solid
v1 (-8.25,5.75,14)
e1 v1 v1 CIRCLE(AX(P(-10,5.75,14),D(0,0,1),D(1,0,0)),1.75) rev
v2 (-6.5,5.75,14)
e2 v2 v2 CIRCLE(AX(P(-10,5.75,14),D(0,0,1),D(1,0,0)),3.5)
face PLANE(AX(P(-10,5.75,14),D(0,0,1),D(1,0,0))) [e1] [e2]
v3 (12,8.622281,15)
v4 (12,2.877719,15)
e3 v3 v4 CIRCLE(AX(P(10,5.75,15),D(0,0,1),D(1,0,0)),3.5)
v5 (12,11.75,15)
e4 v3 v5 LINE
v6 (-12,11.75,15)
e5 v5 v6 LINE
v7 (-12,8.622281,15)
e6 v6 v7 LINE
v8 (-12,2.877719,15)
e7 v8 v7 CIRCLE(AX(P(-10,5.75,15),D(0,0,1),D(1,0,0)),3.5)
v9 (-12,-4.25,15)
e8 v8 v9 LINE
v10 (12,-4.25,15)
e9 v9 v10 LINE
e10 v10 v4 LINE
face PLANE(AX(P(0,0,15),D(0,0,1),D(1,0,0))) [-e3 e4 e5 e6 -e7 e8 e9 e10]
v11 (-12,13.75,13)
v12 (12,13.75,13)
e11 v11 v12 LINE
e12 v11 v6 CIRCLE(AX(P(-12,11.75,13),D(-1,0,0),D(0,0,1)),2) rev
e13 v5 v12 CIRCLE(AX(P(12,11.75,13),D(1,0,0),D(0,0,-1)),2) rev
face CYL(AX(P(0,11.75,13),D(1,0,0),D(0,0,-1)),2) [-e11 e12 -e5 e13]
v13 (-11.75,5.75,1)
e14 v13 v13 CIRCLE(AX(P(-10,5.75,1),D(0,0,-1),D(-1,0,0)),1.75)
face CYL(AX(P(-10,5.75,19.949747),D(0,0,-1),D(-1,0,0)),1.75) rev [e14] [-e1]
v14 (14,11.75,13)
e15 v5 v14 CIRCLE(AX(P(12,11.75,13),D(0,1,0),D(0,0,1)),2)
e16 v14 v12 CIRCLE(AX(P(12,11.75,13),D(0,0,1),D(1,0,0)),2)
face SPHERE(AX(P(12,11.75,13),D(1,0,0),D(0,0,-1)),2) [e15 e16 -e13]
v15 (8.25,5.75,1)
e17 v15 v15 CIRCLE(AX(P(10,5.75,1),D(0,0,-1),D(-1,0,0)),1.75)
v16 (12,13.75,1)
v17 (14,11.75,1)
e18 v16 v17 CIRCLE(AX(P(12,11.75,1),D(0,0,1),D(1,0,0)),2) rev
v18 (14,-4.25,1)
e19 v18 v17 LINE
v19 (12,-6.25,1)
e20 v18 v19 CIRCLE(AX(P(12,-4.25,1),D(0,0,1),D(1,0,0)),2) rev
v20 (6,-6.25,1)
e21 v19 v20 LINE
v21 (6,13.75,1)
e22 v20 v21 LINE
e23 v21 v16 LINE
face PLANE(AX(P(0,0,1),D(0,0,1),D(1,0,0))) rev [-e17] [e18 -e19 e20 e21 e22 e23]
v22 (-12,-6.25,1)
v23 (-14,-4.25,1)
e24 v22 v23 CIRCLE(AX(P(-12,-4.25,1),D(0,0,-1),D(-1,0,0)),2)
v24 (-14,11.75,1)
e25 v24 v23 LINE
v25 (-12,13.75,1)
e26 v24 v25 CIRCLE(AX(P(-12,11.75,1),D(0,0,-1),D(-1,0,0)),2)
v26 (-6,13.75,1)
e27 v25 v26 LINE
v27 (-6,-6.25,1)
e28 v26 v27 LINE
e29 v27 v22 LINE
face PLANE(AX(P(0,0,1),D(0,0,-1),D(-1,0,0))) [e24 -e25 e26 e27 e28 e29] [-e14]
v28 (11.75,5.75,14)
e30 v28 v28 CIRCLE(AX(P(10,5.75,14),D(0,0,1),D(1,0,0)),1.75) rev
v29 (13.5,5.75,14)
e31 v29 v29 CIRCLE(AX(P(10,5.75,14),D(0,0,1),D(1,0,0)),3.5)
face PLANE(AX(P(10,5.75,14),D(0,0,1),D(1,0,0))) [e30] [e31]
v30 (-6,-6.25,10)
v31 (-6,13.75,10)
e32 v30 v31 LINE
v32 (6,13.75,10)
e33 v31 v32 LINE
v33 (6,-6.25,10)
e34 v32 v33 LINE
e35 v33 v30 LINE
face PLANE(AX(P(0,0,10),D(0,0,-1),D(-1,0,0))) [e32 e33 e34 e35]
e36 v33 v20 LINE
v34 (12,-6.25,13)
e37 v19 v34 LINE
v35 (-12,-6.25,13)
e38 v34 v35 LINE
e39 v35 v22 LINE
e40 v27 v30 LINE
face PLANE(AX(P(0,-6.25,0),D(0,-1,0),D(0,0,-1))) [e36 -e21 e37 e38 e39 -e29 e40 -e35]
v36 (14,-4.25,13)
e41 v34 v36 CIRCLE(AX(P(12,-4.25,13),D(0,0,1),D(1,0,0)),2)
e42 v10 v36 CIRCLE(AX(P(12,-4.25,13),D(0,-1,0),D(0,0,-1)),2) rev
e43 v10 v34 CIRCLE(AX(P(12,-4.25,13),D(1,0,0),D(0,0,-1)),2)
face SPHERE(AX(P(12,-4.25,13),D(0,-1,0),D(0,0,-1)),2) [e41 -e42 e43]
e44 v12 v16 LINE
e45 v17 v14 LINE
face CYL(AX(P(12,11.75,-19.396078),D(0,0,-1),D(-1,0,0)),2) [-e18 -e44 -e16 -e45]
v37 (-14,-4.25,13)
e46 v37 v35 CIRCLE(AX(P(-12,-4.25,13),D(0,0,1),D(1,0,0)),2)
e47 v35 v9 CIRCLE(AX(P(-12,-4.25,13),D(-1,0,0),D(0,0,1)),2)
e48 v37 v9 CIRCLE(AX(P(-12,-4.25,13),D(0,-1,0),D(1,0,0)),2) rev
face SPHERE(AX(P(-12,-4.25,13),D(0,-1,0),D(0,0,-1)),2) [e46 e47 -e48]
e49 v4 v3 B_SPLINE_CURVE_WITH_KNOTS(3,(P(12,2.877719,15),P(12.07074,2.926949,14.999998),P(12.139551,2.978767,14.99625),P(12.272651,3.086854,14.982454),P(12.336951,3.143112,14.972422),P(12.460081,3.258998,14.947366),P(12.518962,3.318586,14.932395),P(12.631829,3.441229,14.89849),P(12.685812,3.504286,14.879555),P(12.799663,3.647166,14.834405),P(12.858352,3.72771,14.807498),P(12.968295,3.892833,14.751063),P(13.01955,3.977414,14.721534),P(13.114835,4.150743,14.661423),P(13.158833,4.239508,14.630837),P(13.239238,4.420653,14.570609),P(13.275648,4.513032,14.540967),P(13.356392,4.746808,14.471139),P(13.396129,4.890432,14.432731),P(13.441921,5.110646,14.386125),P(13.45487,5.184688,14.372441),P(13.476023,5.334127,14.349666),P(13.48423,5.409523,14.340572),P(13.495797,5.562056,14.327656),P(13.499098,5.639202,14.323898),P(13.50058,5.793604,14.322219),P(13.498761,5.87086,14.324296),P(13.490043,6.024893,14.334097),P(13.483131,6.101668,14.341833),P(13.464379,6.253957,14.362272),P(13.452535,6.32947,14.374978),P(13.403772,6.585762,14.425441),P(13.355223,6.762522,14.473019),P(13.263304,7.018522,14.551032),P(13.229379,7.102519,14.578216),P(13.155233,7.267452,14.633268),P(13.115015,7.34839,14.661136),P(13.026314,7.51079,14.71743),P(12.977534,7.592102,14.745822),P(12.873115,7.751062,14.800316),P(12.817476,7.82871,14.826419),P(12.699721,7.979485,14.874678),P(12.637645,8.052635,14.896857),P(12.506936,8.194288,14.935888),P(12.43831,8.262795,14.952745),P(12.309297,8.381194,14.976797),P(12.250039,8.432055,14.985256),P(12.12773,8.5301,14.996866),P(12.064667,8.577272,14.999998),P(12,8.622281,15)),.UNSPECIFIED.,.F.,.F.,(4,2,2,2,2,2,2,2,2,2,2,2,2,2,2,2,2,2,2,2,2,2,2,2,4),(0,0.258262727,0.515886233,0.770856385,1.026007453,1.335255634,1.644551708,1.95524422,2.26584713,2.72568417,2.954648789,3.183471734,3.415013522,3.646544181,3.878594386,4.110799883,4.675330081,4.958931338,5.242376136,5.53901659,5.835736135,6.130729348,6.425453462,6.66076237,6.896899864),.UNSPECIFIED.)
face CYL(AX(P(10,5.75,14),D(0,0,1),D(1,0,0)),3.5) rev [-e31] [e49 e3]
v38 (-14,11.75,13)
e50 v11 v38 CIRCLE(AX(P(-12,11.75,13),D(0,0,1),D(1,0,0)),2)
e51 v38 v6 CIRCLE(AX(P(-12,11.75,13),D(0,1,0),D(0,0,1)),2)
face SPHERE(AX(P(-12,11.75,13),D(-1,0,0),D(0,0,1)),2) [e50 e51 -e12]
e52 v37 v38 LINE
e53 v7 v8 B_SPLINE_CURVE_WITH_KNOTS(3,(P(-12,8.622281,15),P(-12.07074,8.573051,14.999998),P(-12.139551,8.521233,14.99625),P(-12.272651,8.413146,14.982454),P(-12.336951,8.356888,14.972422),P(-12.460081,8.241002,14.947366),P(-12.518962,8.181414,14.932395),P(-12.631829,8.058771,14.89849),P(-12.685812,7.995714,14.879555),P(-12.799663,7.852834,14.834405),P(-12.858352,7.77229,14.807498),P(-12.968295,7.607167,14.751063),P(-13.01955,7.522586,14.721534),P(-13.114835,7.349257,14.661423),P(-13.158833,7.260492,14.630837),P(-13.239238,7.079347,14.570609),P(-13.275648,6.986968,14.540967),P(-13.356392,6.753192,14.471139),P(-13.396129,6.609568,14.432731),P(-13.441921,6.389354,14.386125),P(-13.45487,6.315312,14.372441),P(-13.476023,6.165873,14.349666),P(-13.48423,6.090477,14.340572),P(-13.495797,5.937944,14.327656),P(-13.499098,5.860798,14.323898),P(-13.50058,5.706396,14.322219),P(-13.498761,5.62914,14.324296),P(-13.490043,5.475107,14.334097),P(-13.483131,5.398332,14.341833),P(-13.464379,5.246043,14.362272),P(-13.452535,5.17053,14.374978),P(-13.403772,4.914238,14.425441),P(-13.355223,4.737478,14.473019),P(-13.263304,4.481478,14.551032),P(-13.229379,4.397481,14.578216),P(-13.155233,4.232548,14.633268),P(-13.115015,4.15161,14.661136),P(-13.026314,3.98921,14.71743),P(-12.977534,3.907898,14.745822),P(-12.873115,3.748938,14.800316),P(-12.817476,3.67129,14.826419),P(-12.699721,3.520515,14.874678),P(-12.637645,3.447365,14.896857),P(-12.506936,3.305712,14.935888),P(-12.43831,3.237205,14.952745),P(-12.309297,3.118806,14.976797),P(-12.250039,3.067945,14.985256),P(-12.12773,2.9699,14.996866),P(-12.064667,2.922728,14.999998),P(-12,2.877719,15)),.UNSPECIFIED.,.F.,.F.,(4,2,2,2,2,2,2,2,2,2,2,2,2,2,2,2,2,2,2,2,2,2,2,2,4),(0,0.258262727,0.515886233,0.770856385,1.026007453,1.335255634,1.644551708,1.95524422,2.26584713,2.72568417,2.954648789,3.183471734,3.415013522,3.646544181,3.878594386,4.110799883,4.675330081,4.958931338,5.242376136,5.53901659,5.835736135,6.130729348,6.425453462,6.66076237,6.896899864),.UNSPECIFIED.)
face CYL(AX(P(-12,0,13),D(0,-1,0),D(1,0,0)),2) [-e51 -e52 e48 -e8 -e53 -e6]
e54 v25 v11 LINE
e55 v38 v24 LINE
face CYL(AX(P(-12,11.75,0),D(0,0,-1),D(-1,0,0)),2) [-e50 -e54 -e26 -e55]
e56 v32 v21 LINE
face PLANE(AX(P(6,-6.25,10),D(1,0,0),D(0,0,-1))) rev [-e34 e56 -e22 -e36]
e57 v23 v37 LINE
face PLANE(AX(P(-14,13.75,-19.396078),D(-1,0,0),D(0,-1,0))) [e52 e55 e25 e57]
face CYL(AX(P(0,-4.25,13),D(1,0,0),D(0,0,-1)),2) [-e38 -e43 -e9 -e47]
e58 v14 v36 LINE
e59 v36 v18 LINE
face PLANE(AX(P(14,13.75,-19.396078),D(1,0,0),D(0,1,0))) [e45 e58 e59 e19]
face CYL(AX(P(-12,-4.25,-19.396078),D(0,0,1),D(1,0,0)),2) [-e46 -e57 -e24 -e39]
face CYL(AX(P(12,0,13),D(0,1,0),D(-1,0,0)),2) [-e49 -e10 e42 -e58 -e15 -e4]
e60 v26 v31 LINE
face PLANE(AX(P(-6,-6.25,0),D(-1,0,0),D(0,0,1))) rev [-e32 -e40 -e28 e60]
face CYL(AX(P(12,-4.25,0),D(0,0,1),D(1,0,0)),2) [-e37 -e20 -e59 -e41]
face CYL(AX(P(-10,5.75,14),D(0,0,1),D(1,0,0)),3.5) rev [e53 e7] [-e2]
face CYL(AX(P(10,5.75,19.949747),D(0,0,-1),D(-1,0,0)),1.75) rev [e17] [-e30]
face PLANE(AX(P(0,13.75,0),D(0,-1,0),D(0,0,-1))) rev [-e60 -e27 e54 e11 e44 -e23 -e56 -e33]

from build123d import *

# Parameters (mm, degrees)
SKETCH1_W                = 42
SKETCH1_H                = 14
BOSS_EXTRUDE1_DEPTH      = 20
SKETCH2_W                = 11
SKETCH2_H                = 10
CUT_EXTRUDE1_DEPTH       = 33.202484376
SKETCH3_W                = 11
SKETCH3_H                = 10
CUT_EXTRUDE2_DEPTH       = 33.202484376
SKETCH4_W                = 12
SKETCH4_H                = 10
CUT_EXTRUDE3_DEPTH       = 33.202484376
F_4_0_4_DIAMETER_HOLE1_D = 4
FILLET1_R                = 1
SKETCH7_W                = 53.135320533
SKETCH7_H                = 18.013507302
CUT_EXTRUDE4_DEPTH       = 1.5
SKETCH8_W                = 12
SKETCH8_H                = 12.5
CUT_EXTRUDE5_DEPTH       = 1.5
SKETCH9_W                = 20
SKETCH9_H                = 20
BOSS_EXTRUDE2_DEPTH      = 1
SKETCH10_W               = 3.48641985
SKETCH10_H               = 13.666765812
CUT_EXTRUDE6_DEPTH       = 3
SKETCH11_W               = 4.358024812
SKETCH11_H               = 13.509876918
CUT_EXTRUDE7_DEPTH       = 3
BOSS_EXTRUDE3_START      = 0.5
SKETCH14_W               = 12
SKETCH14_H               = 12.5
SKETCH14_R               = 2
BOSS_EXTRUDE3_DEPTH      = 0.5
FILLET7_R                = 3
BOSS_EXTRUDE4_START      = -14
SKETCH15_W               = 4
SKETCH15_H               = 20
BOSS_EXTRUDE4_DEPTH      = 14
SKETCH16_W               = 13.925462325
SKETCH16_H               = 21.292387115
SKETCH16_W_2             = 9.897316219
SKETCH16_H_2             = 21.744987801
CUT_EXTRUDE8_DEPTH       = 30.241451742
SKETCH17_W               = 12
SKETCH17_H               = 7.5
CUT_EXTRUDE9_DEPTH       = 1.5
SKETCH18_W               = 29.147036291
SKETCH18_H               = 2.174846481
CUT_EXTRUDE10_DEPTH      = 5.897378098
SKETCH19_W               = 12
SKETCH19_H               = 20
BOSS_EXTRUDE5_DEPTH      = 1.5
SKETCH20_W               = 4
SKETCH20_H               = 1.602621902
BOSS_EXTRUDE6_DEPTH      = 1.5
SKETCH24_R               = 1.75
CUT_EXTRUDE11_DEPTH      = 14
SKETCH25_R               = 3.5
CUT_EXTRUDE12_DEPTH      = 1
FILLET8_R                = 2


with BuildPart() as part:
    # Sketch1 → Boss-Extrude1 (new body)
    with BuildSketch(Plane.XZ.offset(6.25)):
        with Locations((0, 7)):
            Rectangle(SKETCH1_W, SKETCH1_H)
    extrude(amount=-BOSS_EXTRUDE1_DEPTH)

    # Sketch2 → Cut-Extrude1 (cut, through all)
    with BuildSketch(Plane(origin=(0, 13.75, 0), x_dir=(-1, 0, 0), z_dir=(0, 1, 0))):
        with Locations((-15.5, 9)):
            Rectangle(SKETCH2_W, SKETCH2_H)
    extrude(amount=-CUT_EXTRUDE1_DEPTH, mode=Mode.SUBTRACT)

    # Sketch3 → Cut-Extrude2 (cut, through all)
    with BuildSketch(Plane(origin=(0, 13.75, 0), x_dir=(-1, 0, 0), z_dir=(0, 1, 0))):
        with Locations((15.5, 9)):
            Rectangle(SKETCH3_W, SKETCH3_H)
    extrude(amount=-CUT_EXTRUDE2_DEPTH, mode=Mode.SUBTRACT)

    # Sketch4 → Cut-Extrude3 (cut, through all)
    with BuildSketch(Plane(origin=(0, 13.75, 0), x_dir=(-1, 0, 0), z_dir=(0, 1, 0))):
        with Locations((0, 5)):
            Rectangle(SKETCH4_W, SKETCH4_H)
    extrude(amount=-CUT_EXTRUDE3_DEPTH, mode=Mode.SUBTRACT)

    # Ø4.0 (4) Diameter Hole1 (through all)
    with Locations(Plane.XY.offset(4)):
        with Locations((15, 0), (-15, 0)):
            Hole(F_4_0_4_DIAMETER_HOLE1_D / 2)

    # Fillet1
    fillet1_edges = [part.edges().sort_by_distance(p)[0] for p in [
        (-21, -6.25, 2),
        (-21, 13.75, 2),
        (21, -6.25, 2),
        (21, 13.75, 2),
    ]]
    fillet(fillet1_edges, radius=FILLET1_R)

    # Sketch7 → Cut-Extrude4 (cut)
    with BuildSketch(Plane(origin=(0, 0, 0), x_dir=(-1, 0, 0), z_dir=(0, 0, -1))):
        with Locations((2.896644391, -1.154131749)):
            Rectangle(SKETCH7_W, SKETCH7_H)
    extrude(amount=-CUT_EXTRUDE4_DEPTH, mode=Mode.SUBTRACT)

    # Sketch8 → Cut-Extrude5 (cut)
    with BuildSketch(Plane(origin=(0, 0, 10), x_dir=(-1, 0, 0), z_dir=(0, 0, -1))):
        Rectangle(SKETCH8_W, SKETCH8_H)
    extrude(amount=-CUT_EXTRUDE5_DEPTH, mode=Mode.SUBTRACT)

    # Sketch9 → Boss-Extrude2 (add)
    with BuildSketch(Plane.XY.offset(14)):
        with Locations((0, 3.75)):
            Rectangle(SKETCH9_W, SKETCH9_H)
    extrude(amount=BOSS_EXTRUDE2_DEPTH)

    # Sketch10 → Cut-Extrude6 (cut)
    with BuildSketch(Plane.ZY.offset(21)):
        with Locations((2.776320836, -0.252765439)):
            Rectangle(SKETCH10_W, SKETCH10_H)
    extrude(amount=-CUT_EXTRUDE6_DEPTH, mode=Mode.SUBTRACT)

    # Sketch11 → Cut-Extrude7 (cut)
    with BuildSketch(Plane(origin=(21, 0, 0), x_dir=(0, 0, -1), z_dir=(1, 0, 0))):
        with Locations((-2.462543049, -0.261481489)):
            Rectangle(SKETCH11_W, SKETCH11_H)
    extrude(amount=-CUT_EXTRUDE7_DEPTH, mode=Mode.SUBTRACT)

    # Sketch14 → Boss-Extrude3 (add)
    # profile 1 of 2: a face of its own
    with BuildSketch(Plane(origin=(0, 0, 1.5), x_dir=(-1, 0, 0), z_dir=(0, 0, -1)).offset(BOSS_EXTRUDE3_START)):
        with Locations((12, 0)):
            Rectangle(SKETCH14_W, SKETCH14_H)
        with Locations(Location((15, 0, 0), (0, 0, 180))):
            Circle(SKETCH14_R, mode=Mode.SUBTRACT)
    # profile 2 of 2: a face of its own
    with BuildSketch(Plane(origin=(0, 0, 1.5), x_dir=(-1, 0, 0), z_dir=(0, 0, -1)).offset(BOSS_EXTRUDE3_START)):
        with Locations((-12, 0)):
            Rectangle(SKETCH14_W, SKETCH14_H)
        with Locations(Location((-15, 0, 0), (0, 0, 180))):
            Circle(SKETCH14_R, mode=Mode.SUBTRACT)
    extrude(amount=-BOSS_EXTRUDE3_DEPTH)

    # Fillet7
    # the kernel refuses this fillet: 3 mm, written as the material it takes off along each edge
    with BuildSketch(Plane(origin=(-18, -6.25, 1.5), x_dir=(1, 0, 0), z_dir=(0, 0, 1))) as fillet7_piece_1:
        with BuildLine():
            CenterArc((FILLET7_R, FILLET7_R), FILLET7_R, 180, 90)
            Line((0, FILLET7_R), (0, 0))
            Line((0, 0), (FILLET7_R, 0))
        make_face()
    extrude(amount=10, mode=Mode.SUBTRACT)
    with BuildSketch(Plane(origin=(18, -6.25, 11.5), x_dir=(-1, 0, 0), z_dir=(0, 0, -1))) as fillet7_piece_2:
        with BuildLine():
            CenterArc((FILLET7_R, FILLET7_R), FILLET7_R, 180, 90)
            Line((0, FILLET7_R), (0, 0))
            Line((0, 0), (FILLET7_R, 0))
        make_face()
    extrude(amount=18, mode=Mode.SUBTRACT)
    with BuildSketch(Plane(origin=(-18, 6.25, -6.5), x_dir=(1, 0, 0), z_dir=(0, 0, 1))) as fillet7_piece_3:
        with BuildLine():
            CenterArc((FILLET7_R, -FILLET7_R), FILLET7_R, 90, 90)
            Line((0, -FILLET7_R), (0, 0))
            Line((0, 0), (FILLET7_R, 0))
        make_face()
    extrude(amount=8, mode=Mode.SUBTRACT)
    with BuildSketch(Plane(origin=(-18, -6.25, -6.5), x_dir=(1, 0, 0), z_dir=(0, 0, 1))) as fillet7_piece_4:
        with BuildLine():
            CenterArc((FILLET7_R, FILLET7_R), FILLET7_R, 180, 90)
            Line((0, FILLET7_R), (0, 0))
            Line((0, 0), (FILLET7_R, 0))
        make_face()
    extrude(amount=8, mode=Mode.SUBTRACT)

    # Sketch15 → Boss-Extrude4 (add)
    with BuildSketch(Plane.XY.offset(15).offset(BOSS_EXTRUDE4_START)):
        with Locations((-12, 3.75)):
            Rectangle(SKETCH15_W, SKETCH15_H)
        with Locations((12, 3.75)):
            Rectangle(SKETCH15_W, SKETCH15_H)
    extrude(amount=BOSS_EXTRUDE4_DEPTH)

    # Sketch16 → Cut-Extrude8 (cut, through all)
    with BuildSketch(Plane.XY.offset(15)):
        with Locations((20.962731162, 3.103806442)):
            Rectangle(SKETCH16_W, SKETCH16_H)
        with Locations((-18.94865811, 2.877506099)):
            Rectangle(SKETCH16_W_2, SKETCH16_H_2)
    extrude(amount=-CUT_EXTRUDE8_DEPTH, mode=Mode.SUBTRACT)

    # Sketch17 → Cut-Extrude9 (cut)
    with BuildSketch(Plane(origin=(0, 0, 10), x_dir=(-1, 0, 0), z_dir=(0, 0, -1))):
        with Locations((0, 10)):
            Rectangle(SKETCH17_W, SKETCH17_H)
    extrude(amount=-CUT_EXTRUDE9_DEPTH, mode=Mode.SUBTRACT)

    # Sketch18 → Cut-Extrude10 (cut)
    with BuildSketch(Plane(origin=(0, 7.852621902, 0), x_dir=(-1, 0, 0), z_dir=(0, -1, 0))):
        with Locations((-0.573518146, 0.087423241)):
            Rectangle(SKETCH18_W, SKETCH18_H)
    extrude(amount=-CUT_EXTRUDE10_DEPTH, mode=Mode.SUBTRACT)

    # Sketch19 → Boss-Extrude5 (add)
    with BuildSketch(Plane(origin=(0, 0, 11.5), x_dir=(-1, 0, 0), z_dir=(0, 0, -1))):
        with Locations((0, 3.75)):
            Rectangle(SKETCH19_W, SKETCH19_H)
    extrude(amount=BOSS_EXTRUDE5_DEPTH)

    # Sketch20 → Boss-Extrude6 (add)
    with BuildSketch(Plane(origin=(0, 0, 1), x_dir=(-1, 0, 0), z_dir=(0, 0, -1))):
        with Locations((-8, 7.051310951)):
            Rectangle(SKETCH20_W, SKETCH20_H)
        with Locations((8, 7.051310951)):
            Rectangle(SKETCH20_W, SKETCH20_H)
    extrude(amount=-BOSS_EXTRUDE6_DEPTH)

    # Sketch24 → Cut-Extrude11 (cut)
    with BuildSketch(Plane(origin=(0, 0, 1), x_dir=(-1, 0, 0), z_dir=(0, 0, -1))):
        with Locations((-10, 5.75)):
            Circle(SKETCH24_R)
        with Locations((10, 5.75)):
            Circle(SKETCH24_R)
    extrude(amount=-CUT_EXTRUDE11_DEPTH, mode=Mode.SUBTRACT)

    # Sketch25 → Cut-Extrude12 (cut)
    with BuildSketch(Plane.XY.offset(15)):
        with Locations((10, 5.75)):
            Circle(SKETCH25_R)
        with Locations((-10, 5.75)):
            Circle(SKETCH25_R)
    extrude(amount=-CUT_EXTRUDE12_DEPTH, mode=Mode.SUBTRACT)

    # Fillet8
    # the kernel refuses this fillet: 2 mm, written as the material it takes off along each edge
    with BuildSketch(Plane(origin=(12, -4.25, 13), x_dir=(0, 0, 1), z_dir=(1, 0, 0))) as fillet8_piece_1_section:
        Polygon((0, 0), (FILLET8_R, 0), (FILLET8_R, FILLET8_R), (0, FILLET8_R), align=None)
    fillet8_piece_1 = extrude(amount=FILLET8_R, mode=Mode.PRIVATE)
    fillet8_piece_1 = fillet8_piece_1 - Plane(origin=(12, -4.25, 13), x_dir=(0, 0.7071067811865475, -0.7071067811865475), z_dir=(1, 0, 0)) * Sphere(FILLET8_R, mode=Mode.PRIVATE)
    add(fillet8_piece_1, mode=Mode.SUBTRACT)
    with BuildSketch(Plane(origin=(-12, -4.25, 13), x_dir=(0, -1, 0), z_dir=(0, 0, 1))) as fillet8_piece_2_section:
        Polygon((0, 0), (FILLET8_R, 0), (FILLET8_R, -FILLET8_R), (0, -FILLET8_R), align=None)
    fillet8_piece_2 = extrude(amount=FILLET8_R, mode=Mode.PRIVATE)
    fillet8_piece_2 = fillet8_piece_2 - Plane(origin=(-12, -4.25, 13), x_dir=(0.7071067811865475, 0.7071067811865475, 0), z_dir=(0, 0, 1)) * Sphere(FILLET8_R, mode=Mode.PRIVATE)
    add(fillet8_piece_2, mode=Mode.SUBTRACT)
    with BuildSketch(Plane(origin=(-12, 11.75, 13), x_dir=(0, 0, 1), z_dir=(0, 1, 0))) as fillet8_piece_3_section:
        Polygon((0, 0), (FILLET8_R, 0), (FILLET8_R, -FILLET8_R), (0, -FILLET8_R), align=None)
    fillet8_piece_3 = extrude(amount=FILLET8_R, mode=Mode.PRIVATE)
    fillet8_piece_3 = fillet8_piece_3 - Plane(origin=(-12, 11.75, 13), x_dir=(0.7071067811865475, 0, -0.7071067811865475), z_dir=(0, 1, 0)) * Sphere(FILLET8_R, mode=Mode.PRIVATE)
    add(fillet8_piece_3, mode=Mode.SUBTRACT)
    with BuildSketch(Plane(origin=(12, 11.75, 13), x_dir=(0, 1, 0), z_dir=(1, 0, 0))) as fillet8_piece_4_section:
        Polygon((0, 0), (FILLET8_R, 0), (FILLET8_R, FILLET8_R), (0, FILLET8_R), align=None)
    fillet8_piece_4 = extrude(amount=FILLET8_R, mode=Mode.PRIVATE)
    fillet8_piece_4 = fillet8_piece_4 - Plane(origin=(12, 11.75, 13), x_dir=(0, -0.7071067811865475, -0.7071067811865475), z_dir=(1, 0, 0)) * Sphere(FILLET8_R, mode=Mode.PRIVATE)
    add(fillet8_piece_4, mode=Mode.SUBTRACT)
    with BuildSketch(Plane(origin=(12, -6.25, 15), x_dir=(0, 1, 0), z_dir=(-1, 0, 0))) as fillet8_piece_5:
        with BuildLine():
            CenterArc((FILLET8_R, FILLET8_R), FILLET8_R, 180, 90)
            Line((0, FILLET8_R), (0, 0))
            Line((0, 0), (FILLET8_R, 0))
        make_face()
    extrude(amount=24, mode=Mode.SUBTRACT)
    with BuildSketch(Plane(origin=(-12, 13.75, 15), x_dir=(0, 0, -1), z_dir=(1, 0, 0))) as fillet8_piece_6:
        with BuildLine():
            CenterArc((FILLET8_R, -FILLET8_R), FILLET8_R, 90, 90)
            Line((0, -FILLET8_R), (0, 0))
            Line((0, 0), (FILLET8_R, 0))
        make_face()
    extrude(amount=24, mode=Mode.SUBTRACT)
    with BuildSketch(Plane(origin=(-14, -6.25, -4), x_dir=(1, 0, 0), z_dir=(0, 0, 1))) as fillet8_piece_7:
        with BuildLine():
            CenterArc((FILLET8_R, FILLET8_R), FILLET8_R, 180, 90)
            Line((0, FILLET8_R), (0, 0))
            Line((0, 0), (FILLET8_R, 0))
        make_face()
    extrude(amount=17, mode=Mode.SUBTRACT)
    with BuildSketch(Plane(origin=(-14, 11.75, 15), x_dir=(1, 0, 0), z_dir=(0, -1, 0)), Plane(origin=(14, 11.75, 15), x_dir=(0, 0, -1), z_dir=(0, -1, 0))) as fillet8_piece_8:
        with BuildLine():
            CenterArc((FILLET8_R, -FILLET8_R), FILLET8_R, 90, 90)
            Line((0, -FILLET8_R), (0, 0))
            Line((0, 0), (FILLET8_R, 0))
        make_face()
    extrude(amount=16, mode=Mode.SUBTRACT)
    with BuildSketch(Plane(origin=(14, -6.25, 13), x_dir=(0, 1, 0), z_dir=(0, 0, -1)), Plane(origin=(14, 13.75, -4), x_dir=(0, -1, 0), z_dir=(0, 0, 1)), Plane(origin=(-14, 13.75, -4), x_dir=(1, 0, 0), z_dir=(0, 0, 1))) as fillet8_piece_9:
        with BuildLine():
            CenterArc((FILLET8_R, -FILLET8_R), FILLET8_R, 90, 90)
            Line((0, -FILLET8_R), (0, 0))
            Line((0, 0), (FILLET8_R, 0))
        make_face()
    extrude(amount=17, mode=Mode.SUBTRACT)


solid = part.part
